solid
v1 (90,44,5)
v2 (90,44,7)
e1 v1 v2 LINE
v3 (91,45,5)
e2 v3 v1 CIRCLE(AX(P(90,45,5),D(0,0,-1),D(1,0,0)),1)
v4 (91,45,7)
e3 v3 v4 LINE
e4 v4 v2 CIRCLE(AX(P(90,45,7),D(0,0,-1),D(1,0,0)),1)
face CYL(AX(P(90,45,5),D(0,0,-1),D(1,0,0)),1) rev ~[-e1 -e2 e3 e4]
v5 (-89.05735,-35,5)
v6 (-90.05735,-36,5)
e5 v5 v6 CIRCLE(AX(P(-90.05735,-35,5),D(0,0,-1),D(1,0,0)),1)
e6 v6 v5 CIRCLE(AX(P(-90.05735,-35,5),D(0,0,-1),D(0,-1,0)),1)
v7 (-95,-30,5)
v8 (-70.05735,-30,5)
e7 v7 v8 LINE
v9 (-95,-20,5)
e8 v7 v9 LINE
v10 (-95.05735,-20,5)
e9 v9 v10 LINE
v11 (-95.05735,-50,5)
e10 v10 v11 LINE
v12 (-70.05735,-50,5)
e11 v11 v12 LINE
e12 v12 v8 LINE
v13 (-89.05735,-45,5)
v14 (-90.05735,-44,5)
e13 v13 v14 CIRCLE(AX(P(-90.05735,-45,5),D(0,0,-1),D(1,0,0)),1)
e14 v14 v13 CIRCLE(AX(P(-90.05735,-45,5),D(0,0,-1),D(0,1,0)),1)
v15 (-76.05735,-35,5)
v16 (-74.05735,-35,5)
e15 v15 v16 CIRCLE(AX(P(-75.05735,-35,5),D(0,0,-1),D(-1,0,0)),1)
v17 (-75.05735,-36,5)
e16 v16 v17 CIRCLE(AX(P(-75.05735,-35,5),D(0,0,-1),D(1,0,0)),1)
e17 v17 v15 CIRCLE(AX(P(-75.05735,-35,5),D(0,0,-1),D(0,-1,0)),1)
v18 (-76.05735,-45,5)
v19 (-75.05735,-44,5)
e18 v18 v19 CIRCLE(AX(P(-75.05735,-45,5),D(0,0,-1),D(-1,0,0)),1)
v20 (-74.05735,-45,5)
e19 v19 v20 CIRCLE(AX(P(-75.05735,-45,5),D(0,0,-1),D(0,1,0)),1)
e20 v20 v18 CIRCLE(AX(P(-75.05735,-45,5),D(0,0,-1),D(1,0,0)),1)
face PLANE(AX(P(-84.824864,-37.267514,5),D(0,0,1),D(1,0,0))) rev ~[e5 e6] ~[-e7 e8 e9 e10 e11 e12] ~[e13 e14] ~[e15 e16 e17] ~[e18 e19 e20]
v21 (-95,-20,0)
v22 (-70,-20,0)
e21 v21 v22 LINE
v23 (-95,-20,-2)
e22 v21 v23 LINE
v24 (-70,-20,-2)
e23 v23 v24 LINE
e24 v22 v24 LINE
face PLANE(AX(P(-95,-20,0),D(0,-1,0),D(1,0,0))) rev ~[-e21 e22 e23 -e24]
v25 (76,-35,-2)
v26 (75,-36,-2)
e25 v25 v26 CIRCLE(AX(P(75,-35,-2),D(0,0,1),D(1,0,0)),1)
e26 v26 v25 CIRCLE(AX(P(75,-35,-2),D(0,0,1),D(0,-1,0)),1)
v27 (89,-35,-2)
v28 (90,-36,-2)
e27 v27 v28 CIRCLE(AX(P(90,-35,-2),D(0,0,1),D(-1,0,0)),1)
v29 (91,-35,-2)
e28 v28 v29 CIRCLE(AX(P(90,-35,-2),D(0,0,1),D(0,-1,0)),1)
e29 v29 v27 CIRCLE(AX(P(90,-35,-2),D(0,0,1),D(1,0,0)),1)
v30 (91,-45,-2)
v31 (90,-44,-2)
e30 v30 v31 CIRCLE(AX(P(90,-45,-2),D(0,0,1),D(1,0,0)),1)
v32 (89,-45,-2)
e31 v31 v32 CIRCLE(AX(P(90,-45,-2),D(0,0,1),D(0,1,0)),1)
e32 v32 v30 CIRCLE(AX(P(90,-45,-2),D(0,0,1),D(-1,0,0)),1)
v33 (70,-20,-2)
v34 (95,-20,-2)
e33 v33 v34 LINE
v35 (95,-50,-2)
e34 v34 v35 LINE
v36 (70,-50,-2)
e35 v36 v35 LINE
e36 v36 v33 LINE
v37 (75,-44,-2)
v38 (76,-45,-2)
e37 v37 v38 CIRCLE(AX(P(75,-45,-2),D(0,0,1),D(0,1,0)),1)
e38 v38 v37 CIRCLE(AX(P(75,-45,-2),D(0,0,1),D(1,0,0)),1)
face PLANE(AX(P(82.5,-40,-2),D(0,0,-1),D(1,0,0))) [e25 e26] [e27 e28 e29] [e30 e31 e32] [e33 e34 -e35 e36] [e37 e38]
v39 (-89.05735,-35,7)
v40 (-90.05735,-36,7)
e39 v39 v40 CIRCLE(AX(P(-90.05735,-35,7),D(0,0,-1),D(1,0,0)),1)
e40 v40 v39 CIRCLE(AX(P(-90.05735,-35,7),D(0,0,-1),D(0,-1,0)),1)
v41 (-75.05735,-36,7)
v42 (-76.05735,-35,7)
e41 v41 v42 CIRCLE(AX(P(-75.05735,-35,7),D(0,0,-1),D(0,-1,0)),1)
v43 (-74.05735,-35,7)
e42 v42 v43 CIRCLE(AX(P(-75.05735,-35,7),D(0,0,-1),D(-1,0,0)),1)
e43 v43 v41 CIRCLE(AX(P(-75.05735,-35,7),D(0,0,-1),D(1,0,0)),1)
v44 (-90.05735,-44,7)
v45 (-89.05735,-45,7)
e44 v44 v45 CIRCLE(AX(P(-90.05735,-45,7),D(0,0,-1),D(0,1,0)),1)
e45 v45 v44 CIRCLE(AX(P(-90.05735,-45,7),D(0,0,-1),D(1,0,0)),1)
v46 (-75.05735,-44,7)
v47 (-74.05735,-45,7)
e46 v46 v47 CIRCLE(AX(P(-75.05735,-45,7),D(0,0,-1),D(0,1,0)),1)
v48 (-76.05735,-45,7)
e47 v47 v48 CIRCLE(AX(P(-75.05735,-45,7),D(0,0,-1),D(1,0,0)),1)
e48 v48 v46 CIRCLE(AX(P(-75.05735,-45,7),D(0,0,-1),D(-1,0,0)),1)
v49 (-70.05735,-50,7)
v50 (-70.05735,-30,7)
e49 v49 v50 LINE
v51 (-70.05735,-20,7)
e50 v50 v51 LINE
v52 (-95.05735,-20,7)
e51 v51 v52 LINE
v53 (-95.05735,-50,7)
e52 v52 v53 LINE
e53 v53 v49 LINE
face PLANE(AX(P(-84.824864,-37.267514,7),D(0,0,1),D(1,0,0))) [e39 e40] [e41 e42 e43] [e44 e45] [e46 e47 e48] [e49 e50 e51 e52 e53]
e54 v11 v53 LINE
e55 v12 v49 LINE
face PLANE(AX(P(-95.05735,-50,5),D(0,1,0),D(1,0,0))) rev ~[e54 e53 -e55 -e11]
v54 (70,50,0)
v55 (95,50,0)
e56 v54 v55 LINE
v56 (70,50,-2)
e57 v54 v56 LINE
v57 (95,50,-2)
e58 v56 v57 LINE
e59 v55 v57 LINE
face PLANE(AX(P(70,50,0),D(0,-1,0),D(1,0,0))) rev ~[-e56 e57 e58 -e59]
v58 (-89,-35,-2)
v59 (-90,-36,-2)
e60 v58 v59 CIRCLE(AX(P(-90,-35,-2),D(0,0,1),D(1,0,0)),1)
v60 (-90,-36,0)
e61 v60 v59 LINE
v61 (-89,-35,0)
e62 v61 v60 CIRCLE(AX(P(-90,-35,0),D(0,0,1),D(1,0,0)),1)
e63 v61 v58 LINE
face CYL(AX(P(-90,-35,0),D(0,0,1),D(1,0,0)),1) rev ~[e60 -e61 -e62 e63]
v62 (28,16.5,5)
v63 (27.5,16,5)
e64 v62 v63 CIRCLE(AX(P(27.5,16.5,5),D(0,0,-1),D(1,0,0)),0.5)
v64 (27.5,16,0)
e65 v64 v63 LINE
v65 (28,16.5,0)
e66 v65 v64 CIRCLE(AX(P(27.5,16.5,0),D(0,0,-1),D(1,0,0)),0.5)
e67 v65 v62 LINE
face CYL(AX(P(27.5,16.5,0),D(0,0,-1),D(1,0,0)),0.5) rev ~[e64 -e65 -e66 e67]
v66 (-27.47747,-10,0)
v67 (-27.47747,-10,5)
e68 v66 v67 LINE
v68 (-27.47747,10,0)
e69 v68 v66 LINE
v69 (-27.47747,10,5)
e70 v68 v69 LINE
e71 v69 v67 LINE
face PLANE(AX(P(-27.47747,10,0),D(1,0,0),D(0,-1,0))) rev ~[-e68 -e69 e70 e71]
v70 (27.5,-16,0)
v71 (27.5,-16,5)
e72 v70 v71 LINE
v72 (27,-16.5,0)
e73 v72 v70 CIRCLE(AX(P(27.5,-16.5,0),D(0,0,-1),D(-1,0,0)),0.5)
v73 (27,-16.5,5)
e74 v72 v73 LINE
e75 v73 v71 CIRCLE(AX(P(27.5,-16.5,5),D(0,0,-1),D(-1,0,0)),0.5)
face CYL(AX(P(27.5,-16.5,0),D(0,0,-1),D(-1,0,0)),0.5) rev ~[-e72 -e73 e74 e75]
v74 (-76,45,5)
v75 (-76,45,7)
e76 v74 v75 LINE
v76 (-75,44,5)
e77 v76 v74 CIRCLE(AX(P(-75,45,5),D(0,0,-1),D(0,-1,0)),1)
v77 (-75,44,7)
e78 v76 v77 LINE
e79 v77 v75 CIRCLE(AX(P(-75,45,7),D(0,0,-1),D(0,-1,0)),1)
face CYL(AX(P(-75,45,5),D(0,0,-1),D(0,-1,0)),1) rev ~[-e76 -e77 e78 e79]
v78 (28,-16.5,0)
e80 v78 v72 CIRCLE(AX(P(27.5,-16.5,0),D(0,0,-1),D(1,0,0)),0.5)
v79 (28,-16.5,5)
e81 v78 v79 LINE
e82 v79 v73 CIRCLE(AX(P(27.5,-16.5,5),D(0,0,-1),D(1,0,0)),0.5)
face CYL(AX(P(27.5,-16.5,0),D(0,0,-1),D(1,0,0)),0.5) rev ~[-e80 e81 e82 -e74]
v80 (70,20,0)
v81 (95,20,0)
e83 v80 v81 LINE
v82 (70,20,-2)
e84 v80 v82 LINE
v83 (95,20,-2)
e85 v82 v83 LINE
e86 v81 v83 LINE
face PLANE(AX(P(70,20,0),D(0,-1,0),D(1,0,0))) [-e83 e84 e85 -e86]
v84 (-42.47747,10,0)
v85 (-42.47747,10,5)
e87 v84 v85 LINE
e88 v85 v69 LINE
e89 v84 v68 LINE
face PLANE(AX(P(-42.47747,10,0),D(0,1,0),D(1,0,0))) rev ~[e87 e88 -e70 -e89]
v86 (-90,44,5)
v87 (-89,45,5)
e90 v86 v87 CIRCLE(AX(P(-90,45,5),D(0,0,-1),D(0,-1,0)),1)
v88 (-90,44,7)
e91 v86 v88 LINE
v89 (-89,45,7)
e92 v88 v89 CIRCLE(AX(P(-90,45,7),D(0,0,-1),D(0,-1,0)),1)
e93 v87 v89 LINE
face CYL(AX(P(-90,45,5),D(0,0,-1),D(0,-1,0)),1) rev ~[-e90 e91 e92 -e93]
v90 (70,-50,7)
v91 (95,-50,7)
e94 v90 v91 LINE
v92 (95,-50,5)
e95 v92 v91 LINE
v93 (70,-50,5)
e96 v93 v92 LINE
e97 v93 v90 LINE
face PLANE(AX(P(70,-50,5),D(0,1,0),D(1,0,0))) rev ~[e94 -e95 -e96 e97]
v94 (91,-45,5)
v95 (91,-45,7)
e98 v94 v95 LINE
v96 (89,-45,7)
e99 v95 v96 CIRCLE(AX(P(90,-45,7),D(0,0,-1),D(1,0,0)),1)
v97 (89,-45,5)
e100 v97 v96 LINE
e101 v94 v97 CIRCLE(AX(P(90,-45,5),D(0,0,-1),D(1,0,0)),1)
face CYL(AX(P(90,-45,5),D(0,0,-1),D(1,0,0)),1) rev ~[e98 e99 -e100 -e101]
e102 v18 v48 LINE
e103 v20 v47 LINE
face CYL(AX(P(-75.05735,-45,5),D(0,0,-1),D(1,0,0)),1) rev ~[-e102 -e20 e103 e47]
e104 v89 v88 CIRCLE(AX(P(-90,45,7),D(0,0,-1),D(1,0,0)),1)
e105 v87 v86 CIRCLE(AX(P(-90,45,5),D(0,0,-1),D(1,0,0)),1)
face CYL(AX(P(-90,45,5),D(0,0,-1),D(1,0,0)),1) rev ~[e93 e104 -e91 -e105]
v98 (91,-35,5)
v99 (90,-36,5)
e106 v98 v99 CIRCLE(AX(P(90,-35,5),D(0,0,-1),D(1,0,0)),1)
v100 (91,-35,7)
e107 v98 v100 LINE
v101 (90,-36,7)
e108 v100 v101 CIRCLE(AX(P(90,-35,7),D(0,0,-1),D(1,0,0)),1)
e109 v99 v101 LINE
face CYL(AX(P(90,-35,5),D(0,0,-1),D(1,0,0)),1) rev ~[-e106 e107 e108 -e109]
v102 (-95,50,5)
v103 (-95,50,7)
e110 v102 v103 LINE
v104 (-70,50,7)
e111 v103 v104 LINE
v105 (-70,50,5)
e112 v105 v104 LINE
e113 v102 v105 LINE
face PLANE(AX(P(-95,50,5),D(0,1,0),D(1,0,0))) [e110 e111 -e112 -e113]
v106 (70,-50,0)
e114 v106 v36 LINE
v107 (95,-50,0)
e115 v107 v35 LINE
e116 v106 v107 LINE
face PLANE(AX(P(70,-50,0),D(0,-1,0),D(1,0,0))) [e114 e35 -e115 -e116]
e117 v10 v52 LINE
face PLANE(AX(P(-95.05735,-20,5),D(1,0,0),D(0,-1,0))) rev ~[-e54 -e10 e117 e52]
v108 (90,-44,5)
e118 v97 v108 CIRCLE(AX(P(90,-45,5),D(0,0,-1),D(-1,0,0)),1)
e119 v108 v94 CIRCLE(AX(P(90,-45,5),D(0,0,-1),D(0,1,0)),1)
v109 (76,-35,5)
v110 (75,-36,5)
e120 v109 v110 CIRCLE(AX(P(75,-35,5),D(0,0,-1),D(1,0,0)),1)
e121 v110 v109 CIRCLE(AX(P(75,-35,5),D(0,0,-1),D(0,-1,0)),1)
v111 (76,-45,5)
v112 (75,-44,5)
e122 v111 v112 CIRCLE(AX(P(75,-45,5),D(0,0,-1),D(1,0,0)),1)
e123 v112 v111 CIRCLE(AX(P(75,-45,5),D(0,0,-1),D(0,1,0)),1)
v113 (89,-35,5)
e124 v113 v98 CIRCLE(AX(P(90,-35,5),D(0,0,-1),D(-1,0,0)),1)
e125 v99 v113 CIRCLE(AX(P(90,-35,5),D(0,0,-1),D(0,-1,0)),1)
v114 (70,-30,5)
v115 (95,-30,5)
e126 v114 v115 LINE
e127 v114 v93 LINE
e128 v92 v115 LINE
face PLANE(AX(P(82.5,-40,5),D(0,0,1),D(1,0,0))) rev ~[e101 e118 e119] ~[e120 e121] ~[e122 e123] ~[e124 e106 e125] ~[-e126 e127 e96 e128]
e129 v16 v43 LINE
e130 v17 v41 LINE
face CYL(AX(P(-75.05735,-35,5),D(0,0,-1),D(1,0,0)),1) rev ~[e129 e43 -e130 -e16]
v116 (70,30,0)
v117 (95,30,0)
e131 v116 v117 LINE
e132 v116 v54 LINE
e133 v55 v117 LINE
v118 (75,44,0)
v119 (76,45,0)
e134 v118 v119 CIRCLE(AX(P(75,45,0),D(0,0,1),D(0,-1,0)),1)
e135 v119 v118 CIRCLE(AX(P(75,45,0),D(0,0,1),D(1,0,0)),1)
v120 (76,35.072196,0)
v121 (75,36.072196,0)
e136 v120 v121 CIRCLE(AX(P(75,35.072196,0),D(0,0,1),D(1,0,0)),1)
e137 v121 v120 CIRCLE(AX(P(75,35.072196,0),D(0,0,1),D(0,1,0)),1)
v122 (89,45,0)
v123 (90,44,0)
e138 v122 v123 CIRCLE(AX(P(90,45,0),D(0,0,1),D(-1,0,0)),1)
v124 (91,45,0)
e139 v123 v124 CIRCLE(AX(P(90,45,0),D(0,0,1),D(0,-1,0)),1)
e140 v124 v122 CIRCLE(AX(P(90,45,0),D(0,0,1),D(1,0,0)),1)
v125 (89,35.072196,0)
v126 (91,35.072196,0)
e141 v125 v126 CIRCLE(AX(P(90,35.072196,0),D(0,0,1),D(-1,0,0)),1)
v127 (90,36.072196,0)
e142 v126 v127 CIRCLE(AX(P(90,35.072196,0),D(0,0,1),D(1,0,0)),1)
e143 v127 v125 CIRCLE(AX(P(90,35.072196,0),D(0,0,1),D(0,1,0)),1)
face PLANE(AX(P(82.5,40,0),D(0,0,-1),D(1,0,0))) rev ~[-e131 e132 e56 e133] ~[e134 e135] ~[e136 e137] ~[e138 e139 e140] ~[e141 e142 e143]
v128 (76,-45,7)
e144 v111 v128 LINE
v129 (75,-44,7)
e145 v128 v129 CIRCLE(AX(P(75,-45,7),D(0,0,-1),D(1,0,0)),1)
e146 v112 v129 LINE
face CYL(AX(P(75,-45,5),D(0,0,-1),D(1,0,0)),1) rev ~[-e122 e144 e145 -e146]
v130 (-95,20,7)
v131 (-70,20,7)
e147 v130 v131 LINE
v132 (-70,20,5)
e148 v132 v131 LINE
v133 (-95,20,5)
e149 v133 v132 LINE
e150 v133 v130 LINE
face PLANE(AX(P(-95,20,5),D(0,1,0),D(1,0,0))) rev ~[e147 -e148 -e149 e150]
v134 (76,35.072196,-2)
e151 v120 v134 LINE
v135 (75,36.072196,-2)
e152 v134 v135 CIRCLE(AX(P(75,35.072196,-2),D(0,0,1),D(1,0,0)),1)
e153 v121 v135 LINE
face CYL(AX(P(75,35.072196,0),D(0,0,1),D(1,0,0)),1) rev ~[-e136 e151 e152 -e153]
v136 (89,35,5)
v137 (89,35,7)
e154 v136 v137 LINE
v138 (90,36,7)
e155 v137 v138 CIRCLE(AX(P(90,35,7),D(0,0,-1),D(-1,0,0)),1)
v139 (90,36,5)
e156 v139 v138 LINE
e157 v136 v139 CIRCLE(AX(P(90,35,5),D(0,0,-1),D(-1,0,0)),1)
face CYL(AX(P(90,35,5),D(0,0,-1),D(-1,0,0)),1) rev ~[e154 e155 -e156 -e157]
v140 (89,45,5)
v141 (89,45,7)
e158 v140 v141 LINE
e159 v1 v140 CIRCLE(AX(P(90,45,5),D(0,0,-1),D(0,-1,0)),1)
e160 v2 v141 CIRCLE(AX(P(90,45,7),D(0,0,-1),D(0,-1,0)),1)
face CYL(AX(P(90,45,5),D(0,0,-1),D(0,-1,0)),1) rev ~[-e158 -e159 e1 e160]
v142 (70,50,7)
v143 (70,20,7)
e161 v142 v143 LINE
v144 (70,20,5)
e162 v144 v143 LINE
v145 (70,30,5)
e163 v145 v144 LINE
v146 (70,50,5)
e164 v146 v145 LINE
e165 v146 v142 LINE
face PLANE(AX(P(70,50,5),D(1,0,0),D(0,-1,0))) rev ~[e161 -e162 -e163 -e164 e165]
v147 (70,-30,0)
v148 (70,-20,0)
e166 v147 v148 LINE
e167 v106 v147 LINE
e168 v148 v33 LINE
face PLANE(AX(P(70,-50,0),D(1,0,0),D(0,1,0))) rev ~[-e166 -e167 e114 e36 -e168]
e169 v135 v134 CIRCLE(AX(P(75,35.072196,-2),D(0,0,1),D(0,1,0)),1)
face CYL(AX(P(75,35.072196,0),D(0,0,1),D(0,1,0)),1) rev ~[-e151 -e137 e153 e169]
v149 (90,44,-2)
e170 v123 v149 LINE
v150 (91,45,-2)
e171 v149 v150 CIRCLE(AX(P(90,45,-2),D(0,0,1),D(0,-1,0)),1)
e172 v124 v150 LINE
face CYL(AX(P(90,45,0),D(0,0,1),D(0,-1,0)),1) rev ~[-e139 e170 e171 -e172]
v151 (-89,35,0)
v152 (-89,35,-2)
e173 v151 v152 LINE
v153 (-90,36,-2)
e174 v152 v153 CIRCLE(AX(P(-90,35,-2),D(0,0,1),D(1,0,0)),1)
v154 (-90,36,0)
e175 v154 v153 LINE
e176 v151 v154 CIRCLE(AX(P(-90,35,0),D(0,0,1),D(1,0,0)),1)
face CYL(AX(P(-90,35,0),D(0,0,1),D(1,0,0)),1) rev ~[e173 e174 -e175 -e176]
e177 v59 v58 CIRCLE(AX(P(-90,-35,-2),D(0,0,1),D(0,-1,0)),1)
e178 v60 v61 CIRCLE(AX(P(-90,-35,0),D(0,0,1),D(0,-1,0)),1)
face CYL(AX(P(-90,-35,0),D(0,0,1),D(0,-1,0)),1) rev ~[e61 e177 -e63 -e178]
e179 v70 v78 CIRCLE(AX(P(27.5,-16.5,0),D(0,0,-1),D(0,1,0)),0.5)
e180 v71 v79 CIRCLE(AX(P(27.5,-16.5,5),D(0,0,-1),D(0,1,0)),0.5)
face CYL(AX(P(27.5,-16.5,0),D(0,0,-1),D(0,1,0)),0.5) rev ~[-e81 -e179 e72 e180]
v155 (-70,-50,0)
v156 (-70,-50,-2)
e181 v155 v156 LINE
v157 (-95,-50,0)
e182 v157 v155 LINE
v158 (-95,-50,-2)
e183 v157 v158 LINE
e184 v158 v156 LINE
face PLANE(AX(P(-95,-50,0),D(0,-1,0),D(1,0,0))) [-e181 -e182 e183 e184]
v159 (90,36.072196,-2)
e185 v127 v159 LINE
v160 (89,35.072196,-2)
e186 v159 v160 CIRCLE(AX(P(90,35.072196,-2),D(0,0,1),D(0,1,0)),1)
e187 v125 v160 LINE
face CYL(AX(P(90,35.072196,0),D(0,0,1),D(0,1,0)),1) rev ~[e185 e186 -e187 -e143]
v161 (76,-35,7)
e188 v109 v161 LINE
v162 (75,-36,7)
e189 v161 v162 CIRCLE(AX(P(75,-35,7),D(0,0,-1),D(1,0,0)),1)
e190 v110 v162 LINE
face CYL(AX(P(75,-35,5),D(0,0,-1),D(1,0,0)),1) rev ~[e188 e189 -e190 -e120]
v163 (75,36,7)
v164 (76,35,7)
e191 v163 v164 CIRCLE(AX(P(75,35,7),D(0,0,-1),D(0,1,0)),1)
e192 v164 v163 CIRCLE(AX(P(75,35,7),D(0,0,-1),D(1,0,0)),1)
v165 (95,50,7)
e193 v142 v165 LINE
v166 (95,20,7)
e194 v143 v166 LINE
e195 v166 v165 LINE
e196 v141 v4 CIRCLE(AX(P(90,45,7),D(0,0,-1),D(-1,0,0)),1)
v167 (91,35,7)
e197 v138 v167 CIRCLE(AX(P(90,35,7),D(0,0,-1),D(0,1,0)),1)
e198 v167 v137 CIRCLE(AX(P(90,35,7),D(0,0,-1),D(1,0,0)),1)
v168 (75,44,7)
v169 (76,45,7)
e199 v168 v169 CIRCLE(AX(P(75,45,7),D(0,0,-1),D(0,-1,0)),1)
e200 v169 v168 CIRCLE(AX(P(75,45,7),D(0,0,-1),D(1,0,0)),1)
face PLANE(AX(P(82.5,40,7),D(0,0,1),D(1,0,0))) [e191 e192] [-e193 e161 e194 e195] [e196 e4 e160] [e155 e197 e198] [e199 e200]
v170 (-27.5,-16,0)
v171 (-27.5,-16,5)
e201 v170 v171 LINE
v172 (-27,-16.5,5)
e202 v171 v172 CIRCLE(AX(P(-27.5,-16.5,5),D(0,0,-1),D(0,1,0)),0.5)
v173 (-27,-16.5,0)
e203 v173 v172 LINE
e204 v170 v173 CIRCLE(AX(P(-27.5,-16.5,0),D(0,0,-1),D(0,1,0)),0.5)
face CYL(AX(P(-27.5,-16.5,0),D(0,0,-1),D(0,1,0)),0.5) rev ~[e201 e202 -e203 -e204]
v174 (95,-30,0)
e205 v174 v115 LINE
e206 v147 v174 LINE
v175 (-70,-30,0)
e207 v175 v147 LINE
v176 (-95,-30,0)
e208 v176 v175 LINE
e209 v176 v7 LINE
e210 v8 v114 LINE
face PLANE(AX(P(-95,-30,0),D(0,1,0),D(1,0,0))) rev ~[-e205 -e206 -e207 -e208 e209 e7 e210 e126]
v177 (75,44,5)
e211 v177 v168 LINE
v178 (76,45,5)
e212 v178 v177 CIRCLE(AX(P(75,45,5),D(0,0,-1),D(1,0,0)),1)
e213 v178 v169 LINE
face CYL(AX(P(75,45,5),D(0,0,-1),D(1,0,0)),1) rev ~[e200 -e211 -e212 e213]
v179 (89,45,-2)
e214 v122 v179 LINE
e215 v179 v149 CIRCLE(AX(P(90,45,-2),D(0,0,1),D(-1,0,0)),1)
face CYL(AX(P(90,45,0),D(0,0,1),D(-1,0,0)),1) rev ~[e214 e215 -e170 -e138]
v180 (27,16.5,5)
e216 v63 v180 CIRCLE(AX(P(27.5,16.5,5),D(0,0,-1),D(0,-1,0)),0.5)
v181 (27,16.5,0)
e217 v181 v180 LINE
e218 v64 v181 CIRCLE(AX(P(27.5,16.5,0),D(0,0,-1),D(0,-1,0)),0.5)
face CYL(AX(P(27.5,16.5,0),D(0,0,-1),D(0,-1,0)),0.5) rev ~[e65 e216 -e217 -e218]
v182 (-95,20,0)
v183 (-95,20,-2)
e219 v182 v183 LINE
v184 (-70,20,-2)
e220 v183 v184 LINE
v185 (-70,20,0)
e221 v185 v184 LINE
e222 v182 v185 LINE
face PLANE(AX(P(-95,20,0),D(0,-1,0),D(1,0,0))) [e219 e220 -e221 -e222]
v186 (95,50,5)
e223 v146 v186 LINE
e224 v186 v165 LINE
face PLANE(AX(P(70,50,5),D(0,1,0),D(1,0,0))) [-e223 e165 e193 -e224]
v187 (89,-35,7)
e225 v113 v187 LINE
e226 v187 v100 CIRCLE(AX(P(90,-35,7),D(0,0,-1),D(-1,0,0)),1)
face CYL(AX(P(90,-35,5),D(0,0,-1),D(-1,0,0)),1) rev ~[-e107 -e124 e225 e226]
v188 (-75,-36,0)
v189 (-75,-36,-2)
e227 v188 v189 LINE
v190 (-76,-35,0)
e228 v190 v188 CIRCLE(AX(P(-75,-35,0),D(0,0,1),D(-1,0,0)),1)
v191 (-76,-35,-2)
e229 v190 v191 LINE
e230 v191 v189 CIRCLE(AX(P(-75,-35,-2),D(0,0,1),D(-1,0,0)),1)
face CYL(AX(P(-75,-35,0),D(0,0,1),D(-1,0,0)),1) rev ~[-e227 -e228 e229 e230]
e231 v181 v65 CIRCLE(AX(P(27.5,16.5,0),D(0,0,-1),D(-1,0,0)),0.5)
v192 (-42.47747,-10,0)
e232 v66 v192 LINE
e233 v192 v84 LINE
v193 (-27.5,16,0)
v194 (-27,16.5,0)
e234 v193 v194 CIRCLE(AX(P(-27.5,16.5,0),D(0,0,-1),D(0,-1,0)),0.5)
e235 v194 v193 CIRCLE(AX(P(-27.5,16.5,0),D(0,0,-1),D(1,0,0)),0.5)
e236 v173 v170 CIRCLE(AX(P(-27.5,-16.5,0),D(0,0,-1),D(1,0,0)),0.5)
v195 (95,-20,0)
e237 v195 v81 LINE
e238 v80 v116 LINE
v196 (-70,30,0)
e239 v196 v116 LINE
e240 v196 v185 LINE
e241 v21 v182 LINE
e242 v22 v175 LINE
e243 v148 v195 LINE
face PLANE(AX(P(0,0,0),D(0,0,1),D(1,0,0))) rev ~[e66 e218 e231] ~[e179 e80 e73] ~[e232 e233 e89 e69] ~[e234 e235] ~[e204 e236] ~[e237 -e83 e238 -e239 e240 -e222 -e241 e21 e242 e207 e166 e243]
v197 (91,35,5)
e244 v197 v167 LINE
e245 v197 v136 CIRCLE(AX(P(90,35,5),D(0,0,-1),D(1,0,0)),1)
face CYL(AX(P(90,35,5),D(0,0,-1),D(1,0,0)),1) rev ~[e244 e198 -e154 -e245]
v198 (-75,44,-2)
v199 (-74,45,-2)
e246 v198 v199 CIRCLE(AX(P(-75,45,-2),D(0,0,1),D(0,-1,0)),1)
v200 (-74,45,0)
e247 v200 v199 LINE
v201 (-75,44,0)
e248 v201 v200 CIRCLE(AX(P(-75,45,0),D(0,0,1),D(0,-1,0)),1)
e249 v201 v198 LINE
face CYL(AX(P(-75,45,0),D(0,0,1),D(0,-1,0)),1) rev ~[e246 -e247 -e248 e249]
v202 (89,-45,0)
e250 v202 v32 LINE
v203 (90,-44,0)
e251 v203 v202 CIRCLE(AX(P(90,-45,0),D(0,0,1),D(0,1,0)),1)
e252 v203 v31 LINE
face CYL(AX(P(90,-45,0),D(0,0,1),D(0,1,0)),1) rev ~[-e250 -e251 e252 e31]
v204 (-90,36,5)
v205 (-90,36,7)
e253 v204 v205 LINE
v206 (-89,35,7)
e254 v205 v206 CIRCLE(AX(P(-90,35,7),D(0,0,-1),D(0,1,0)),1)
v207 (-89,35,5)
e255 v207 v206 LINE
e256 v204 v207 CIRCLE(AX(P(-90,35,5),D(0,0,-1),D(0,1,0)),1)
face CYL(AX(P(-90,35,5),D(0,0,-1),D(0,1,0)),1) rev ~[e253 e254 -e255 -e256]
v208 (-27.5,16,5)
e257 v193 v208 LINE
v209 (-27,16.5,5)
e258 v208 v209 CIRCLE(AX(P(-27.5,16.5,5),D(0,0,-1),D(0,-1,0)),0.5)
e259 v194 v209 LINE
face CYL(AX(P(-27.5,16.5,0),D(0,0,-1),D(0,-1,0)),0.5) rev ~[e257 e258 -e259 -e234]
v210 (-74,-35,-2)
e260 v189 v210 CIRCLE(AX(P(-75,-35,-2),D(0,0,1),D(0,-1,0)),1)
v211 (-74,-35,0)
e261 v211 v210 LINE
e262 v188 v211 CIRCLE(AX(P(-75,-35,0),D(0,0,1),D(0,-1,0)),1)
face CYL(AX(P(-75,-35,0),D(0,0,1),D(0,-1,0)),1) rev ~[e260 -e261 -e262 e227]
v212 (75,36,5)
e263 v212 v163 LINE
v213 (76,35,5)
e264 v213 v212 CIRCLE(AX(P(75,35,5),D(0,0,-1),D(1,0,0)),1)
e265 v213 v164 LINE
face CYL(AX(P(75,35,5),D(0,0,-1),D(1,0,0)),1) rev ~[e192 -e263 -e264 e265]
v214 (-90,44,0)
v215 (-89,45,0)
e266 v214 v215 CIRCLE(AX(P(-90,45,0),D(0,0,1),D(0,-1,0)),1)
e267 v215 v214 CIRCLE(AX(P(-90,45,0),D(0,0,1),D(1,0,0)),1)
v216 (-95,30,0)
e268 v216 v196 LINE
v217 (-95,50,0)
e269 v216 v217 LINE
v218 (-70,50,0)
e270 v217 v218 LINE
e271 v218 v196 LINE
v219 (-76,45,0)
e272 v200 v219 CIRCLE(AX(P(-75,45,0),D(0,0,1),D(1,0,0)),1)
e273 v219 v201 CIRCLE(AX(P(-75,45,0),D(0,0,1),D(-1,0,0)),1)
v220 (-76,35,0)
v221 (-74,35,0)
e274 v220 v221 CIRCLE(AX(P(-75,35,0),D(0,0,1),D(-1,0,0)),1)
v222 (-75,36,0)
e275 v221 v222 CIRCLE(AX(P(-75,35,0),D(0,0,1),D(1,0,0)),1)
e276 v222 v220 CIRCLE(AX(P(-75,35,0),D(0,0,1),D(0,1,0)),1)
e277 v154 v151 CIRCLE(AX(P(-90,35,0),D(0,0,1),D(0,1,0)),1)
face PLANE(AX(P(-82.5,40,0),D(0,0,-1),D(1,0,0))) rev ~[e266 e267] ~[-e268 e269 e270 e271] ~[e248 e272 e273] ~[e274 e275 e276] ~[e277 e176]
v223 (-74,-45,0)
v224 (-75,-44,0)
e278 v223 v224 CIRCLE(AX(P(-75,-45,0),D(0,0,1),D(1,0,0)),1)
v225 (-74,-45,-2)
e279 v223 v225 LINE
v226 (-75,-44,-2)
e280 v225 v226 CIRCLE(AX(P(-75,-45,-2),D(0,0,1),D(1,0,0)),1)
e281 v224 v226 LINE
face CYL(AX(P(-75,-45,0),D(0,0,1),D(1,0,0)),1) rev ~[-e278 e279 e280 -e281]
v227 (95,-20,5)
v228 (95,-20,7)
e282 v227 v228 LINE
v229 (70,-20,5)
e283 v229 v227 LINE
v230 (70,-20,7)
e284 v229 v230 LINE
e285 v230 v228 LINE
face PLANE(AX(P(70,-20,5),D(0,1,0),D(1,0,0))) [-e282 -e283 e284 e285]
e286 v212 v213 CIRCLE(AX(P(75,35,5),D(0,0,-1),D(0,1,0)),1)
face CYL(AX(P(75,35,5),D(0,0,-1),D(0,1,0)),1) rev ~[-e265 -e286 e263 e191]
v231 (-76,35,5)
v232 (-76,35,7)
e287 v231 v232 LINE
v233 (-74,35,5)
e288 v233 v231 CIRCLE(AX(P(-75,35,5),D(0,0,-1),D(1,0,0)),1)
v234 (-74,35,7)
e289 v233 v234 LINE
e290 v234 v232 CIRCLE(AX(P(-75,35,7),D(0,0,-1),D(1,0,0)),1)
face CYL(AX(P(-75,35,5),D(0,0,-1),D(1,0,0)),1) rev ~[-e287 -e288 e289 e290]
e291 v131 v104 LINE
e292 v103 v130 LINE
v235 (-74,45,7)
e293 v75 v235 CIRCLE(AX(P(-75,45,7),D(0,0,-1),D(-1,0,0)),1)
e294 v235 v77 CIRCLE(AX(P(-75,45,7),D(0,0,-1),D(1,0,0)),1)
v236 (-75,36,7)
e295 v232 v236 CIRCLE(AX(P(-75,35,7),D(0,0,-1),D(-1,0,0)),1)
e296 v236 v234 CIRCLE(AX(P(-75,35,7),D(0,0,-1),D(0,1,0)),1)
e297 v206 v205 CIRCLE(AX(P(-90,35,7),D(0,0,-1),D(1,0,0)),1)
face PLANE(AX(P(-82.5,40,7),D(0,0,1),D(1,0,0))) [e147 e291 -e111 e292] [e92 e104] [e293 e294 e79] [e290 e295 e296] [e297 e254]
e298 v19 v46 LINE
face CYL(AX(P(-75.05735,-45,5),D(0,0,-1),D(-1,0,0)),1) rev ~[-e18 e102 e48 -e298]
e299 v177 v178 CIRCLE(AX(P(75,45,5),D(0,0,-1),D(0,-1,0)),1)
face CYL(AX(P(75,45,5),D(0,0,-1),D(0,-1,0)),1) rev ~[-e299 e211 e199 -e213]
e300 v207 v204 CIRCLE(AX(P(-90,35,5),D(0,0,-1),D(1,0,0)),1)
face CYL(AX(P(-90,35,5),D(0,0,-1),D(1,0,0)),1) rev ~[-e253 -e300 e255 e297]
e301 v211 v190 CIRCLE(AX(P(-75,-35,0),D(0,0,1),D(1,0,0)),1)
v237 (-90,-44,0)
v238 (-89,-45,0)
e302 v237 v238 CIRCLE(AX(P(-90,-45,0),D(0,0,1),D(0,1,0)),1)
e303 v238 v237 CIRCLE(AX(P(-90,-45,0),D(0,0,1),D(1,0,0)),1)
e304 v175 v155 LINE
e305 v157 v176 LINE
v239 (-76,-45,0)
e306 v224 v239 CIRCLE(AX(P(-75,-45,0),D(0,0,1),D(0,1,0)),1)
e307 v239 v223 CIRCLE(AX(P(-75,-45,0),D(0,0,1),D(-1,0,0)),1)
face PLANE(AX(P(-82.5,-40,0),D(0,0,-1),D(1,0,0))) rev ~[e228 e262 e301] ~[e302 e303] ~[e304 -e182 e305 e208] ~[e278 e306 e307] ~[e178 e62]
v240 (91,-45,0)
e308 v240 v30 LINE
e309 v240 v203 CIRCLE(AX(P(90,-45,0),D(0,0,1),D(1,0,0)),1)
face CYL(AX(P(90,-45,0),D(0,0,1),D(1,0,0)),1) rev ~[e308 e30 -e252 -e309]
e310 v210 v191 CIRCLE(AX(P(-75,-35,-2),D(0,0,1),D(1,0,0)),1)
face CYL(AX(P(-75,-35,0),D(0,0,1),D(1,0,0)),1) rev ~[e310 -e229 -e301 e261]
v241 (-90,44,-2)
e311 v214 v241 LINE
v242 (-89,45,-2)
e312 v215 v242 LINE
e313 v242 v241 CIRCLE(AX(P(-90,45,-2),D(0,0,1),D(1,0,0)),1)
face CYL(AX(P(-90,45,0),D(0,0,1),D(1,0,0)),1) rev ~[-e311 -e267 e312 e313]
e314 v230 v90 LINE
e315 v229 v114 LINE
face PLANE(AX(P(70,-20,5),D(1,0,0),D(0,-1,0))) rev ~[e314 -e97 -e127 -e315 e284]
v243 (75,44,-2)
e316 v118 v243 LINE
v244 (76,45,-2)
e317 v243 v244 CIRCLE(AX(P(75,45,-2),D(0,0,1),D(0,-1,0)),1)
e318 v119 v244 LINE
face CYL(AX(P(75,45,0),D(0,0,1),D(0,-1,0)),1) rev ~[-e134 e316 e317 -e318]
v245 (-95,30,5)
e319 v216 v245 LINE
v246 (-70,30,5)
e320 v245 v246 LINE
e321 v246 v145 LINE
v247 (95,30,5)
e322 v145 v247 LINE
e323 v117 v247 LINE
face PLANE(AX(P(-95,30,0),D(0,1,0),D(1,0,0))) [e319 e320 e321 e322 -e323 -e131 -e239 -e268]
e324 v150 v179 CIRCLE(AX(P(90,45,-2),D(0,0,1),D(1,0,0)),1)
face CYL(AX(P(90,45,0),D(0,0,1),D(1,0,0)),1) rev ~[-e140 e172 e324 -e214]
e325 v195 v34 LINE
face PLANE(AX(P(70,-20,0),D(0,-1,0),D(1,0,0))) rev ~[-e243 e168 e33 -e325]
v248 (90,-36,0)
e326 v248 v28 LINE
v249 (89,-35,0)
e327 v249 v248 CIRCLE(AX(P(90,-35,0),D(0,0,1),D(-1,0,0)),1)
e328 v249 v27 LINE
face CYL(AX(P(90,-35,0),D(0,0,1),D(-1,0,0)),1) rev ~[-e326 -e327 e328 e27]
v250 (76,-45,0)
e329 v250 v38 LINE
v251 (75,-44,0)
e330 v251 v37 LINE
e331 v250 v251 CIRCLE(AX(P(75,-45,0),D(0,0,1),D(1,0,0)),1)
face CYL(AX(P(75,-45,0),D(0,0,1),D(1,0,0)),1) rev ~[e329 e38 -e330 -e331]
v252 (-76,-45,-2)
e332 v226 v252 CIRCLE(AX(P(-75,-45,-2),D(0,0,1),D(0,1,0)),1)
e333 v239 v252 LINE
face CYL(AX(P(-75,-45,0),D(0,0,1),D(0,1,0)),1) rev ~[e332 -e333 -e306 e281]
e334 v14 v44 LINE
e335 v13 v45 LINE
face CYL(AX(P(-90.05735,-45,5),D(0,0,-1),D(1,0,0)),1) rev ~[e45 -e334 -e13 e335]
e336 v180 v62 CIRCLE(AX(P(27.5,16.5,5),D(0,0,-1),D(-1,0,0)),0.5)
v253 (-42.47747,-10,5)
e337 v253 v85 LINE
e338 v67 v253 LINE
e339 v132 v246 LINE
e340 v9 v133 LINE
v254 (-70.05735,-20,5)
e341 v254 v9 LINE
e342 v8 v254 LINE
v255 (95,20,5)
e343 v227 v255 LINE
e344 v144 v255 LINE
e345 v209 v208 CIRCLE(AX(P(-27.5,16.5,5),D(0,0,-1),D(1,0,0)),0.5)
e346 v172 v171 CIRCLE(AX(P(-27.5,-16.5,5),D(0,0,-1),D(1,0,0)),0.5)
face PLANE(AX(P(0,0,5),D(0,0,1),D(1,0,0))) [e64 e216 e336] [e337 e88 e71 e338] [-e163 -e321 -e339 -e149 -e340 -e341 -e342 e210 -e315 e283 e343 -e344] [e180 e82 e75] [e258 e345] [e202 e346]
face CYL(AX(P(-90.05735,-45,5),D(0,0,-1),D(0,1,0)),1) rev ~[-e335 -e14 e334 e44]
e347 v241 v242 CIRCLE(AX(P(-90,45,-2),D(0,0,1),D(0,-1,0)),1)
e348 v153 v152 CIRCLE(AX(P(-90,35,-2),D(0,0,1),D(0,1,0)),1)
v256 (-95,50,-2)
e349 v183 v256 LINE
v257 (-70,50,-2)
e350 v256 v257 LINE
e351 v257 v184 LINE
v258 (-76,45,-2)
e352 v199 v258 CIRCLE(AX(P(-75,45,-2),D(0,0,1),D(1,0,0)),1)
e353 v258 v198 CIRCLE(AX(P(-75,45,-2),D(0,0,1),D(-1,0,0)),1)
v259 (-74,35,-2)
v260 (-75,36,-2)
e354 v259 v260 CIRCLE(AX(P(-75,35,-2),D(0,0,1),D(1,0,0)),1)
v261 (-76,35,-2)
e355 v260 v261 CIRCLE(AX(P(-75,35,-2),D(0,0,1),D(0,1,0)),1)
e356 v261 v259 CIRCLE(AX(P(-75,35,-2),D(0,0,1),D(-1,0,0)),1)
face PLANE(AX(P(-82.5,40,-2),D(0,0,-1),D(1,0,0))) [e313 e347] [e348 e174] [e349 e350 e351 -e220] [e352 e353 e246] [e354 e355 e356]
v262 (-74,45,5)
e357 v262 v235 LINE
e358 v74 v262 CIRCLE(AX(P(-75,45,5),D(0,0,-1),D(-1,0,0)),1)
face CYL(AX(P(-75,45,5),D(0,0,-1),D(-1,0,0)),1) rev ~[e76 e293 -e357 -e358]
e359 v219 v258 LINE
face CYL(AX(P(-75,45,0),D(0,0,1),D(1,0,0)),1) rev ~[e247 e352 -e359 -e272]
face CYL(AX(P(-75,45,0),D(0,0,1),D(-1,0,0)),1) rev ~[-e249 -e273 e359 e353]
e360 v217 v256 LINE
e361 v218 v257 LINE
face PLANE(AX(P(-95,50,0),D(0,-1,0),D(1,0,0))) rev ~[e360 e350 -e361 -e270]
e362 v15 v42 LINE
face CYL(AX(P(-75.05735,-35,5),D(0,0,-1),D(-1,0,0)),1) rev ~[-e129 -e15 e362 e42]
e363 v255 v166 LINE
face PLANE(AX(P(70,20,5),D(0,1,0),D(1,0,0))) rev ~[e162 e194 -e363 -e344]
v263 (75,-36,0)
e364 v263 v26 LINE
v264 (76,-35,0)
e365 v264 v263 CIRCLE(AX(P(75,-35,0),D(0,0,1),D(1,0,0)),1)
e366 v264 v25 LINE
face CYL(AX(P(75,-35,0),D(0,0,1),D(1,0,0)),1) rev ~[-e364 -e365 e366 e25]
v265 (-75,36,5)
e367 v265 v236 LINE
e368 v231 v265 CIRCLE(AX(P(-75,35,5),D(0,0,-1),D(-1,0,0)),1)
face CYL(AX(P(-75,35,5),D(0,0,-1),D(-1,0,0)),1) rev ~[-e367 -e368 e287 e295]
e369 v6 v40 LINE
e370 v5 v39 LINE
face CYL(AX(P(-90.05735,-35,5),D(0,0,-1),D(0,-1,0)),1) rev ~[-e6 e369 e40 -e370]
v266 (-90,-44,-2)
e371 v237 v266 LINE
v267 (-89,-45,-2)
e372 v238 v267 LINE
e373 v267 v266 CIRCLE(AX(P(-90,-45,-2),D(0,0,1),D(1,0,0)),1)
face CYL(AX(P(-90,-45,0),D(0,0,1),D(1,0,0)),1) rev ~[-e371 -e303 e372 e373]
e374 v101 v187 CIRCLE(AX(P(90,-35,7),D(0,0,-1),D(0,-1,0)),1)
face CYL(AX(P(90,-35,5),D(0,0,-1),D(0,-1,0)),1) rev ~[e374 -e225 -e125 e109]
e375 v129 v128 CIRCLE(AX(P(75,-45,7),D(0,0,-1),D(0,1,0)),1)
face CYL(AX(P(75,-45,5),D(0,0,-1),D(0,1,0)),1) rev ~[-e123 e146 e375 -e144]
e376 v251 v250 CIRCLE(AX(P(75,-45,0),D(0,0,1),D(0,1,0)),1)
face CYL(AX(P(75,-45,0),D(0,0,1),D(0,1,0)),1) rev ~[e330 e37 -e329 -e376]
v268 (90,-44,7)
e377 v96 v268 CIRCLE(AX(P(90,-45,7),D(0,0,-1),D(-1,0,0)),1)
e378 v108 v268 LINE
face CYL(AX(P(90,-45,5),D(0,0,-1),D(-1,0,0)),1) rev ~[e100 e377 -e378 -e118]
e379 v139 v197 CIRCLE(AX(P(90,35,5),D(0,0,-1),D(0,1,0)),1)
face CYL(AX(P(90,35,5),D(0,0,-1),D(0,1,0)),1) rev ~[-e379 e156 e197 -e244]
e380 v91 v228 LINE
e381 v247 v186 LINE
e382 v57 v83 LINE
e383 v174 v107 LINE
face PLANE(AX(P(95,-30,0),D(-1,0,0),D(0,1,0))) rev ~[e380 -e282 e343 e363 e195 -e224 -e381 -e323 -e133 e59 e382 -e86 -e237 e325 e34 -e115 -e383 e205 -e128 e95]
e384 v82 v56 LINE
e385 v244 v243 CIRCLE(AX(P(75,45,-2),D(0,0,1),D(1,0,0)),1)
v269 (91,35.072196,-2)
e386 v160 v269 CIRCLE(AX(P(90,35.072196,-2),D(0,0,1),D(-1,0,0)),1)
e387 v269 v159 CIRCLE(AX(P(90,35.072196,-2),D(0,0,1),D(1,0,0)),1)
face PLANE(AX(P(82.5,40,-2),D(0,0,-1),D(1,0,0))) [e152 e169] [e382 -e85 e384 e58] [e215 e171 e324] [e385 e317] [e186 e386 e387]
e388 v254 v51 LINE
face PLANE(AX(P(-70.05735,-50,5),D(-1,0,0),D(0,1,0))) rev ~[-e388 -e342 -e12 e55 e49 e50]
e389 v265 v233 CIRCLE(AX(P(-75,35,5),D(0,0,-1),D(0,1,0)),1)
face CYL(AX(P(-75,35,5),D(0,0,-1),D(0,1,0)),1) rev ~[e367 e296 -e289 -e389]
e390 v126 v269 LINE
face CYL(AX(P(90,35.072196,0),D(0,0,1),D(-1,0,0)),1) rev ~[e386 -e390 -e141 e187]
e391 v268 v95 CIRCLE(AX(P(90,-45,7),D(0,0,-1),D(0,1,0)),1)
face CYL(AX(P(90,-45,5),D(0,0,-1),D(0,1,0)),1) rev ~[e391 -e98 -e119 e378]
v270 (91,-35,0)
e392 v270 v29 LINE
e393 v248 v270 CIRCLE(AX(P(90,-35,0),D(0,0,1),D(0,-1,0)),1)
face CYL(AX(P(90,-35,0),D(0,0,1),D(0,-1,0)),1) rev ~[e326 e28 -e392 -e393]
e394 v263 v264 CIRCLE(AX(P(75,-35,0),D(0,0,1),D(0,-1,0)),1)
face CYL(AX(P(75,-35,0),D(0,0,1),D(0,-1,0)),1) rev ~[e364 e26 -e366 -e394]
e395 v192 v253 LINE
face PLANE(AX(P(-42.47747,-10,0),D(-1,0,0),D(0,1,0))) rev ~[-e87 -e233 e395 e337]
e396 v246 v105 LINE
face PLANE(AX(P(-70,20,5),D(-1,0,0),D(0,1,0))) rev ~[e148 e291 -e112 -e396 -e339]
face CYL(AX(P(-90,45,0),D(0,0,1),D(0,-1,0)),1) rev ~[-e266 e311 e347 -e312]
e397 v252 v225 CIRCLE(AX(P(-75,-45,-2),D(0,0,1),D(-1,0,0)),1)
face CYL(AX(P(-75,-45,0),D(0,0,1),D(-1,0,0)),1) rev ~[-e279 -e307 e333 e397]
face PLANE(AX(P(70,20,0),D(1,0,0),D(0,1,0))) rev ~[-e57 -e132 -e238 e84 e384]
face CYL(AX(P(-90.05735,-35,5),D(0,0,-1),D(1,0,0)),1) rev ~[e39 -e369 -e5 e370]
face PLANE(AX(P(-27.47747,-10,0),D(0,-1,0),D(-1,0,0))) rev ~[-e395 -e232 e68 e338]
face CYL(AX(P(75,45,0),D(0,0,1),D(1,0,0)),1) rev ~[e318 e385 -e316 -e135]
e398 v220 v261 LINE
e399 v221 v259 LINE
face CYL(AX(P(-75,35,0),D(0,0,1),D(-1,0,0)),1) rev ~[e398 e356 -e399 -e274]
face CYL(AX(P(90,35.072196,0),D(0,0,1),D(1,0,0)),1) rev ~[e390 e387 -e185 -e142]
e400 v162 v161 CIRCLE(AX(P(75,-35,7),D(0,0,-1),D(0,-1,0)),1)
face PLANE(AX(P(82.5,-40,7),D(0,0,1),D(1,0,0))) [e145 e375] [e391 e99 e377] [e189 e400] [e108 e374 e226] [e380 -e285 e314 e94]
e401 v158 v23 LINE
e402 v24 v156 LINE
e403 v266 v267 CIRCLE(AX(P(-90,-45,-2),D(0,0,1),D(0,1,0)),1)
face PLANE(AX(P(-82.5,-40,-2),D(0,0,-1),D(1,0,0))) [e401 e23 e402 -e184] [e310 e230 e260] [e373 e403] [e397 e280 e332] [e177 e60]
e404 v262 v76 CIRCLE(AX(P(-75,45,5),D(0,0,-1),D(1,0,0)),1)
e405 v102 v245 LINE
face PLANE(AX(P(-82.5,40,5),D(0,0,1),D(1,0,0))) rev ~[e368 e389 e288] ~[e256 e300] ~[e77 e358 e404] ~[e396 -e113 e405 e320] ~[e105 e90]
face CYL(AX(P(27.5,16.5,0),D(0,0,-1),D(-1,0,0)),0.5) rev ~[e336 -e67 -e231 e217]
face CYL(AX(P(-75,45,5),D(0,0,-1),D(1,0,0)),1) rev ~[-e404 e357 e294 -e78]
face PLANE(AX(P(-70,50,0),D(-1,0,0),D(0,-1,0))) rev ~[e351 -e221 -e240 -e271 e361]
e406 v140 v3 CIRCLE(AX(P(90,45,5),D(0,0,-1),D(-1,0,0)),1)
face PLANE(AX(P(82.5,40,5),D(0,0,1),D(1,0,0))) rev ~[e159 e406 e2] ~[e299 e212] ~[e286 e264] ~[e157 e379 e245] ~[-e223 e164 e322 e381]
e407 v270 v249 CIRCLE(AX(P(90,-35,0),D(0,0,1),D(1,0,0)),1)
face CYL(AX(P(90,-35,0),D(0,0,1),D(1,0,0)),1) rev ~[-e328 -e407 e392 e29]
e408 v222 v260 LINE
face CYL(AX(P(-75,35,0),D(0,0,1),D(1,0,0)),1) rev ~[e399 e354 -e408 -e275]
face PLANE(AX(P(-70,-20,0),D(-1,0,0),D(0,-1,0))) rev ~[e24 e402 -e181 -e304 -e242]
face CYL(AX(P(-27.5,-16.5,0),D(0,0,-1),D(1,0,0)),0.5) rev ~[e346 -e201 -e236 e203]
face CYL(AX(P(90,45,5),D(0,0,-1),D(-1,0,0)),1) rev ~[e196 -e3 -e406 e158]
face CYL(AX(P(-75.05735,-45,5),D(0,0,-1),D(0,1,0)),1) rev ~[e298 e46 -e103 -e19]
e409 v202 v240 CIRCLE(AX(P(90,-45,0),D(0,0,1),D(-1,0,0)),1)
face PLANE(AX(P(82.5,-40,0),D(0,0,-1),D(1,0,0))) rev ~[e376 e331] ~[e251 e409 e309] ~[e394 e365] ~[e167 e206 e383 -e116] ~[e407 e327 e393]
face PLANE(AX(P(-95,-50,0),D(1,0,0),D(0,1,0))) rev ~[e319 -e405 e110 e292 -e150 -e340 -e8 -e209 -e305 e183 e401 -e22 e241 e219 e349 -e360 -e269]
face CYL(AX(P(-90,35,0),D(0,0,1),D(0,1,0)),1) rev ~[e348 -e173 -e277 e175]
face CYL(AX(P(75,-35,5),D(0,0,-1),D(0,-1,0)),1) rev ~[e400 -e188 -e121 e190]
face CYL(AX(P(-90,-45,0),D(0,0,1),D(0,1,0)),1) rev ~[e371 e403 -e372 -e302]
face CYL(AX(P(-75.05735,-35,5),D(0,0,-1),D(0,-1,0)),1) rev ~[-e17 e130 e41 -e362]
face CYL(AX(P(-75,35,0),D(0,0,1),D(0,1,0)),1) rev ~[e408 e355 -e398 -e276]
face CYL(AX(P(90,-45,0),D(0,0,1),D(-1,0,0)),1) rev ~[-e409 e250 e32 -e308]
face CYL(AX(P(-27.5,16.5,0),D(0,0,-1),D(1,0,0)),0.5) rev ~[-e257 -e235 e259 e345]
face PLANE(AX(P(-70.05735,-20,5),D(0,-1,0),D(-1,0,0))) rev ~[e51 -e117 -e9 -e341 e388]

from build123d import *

# Parameters (mm, degrees)
F0_W     = 190
F0_H     = 60
F1_DEPTH = 5
F2_W     = 25
F2_H     = 20
F2_H_2   = 10
F2_W_2   = 24.9426496029
F3_DEPTH = 2
F4_W     = 25
F4_H     = 20
F4_H_2   = 10
F5_DEPTH = 2


with BuildPart() as f1:
    # F0 (on Top) → F1 (new body)
    with BuildSketch(Plane.XY):
        Rectangle(F0_W, F0_H)
        with BuildLine():
            Line((27, -16.5), (-27, -16.5))
            ThreePointArc((-27, -16.5), (-27.8535533906, -16.8535533906), (-27.5, -16))
            Line((-27.5, -16), (-27.5, -10))
            Line((-27.5, -10), (-42.4774698913, -10))
            Line((-42.4774698913, -10), (-42.4774698913, 10))
            Line((-42.4774698913, 10), (-27.5, 10))
            Line((-27.5, 10), (-27.5, 16))
            ThreePointArc((-27.5, 16), (-27.8535533906, 16.8535533906), (-27, 16.5))
            Line((-27, 16.5), (27, 16.5))
            ThreePointArc((27, 16.5), (27.5, 17), (28, 16.5))
            ThreePointArc((28, 16.5), (27.8535533906, 16.1464466094), (27.5, 16))
            Line((27.5, 16), (27.5, -16))
            ThreePointArc((27.5, -16), (27.8535533906, -16.1464466094), (28, -16.5))
            ThreePointArc((28, -16.5), (27.5, -17), (27, -16.5))
        make_face(mode=Mode.SUBTRACT)
        with BuildLine():
            ThreePointArc((-27.5, -16), (-27.1464466094, -16.1464466094), (-27, -16.5))
            Line((-27, -16.5), (27, -16.5))
            ThreePointArc((27, -16.5), (27.1464466094, -16.1464466094), (27.5, -16))
            Line((27.5, -16), (27.5, 16))
            ThreePointArc((27.5, 16), (27.1464466094, 16.1464466094), (27, 16.5))
            Line((27, 16.5), (-27, 16.5))
            ThreePointArc((-27, 16.5), (-27.1464466094, 16.1464466094), (-27.5, 16))
            Line((-27.5, 16), (-27.5, 10))
            Line((-27.5, 10), (-27.4774698913, 10))
            Line((-27.4774698913, 10), (-27.4774698913, -10))
            Line((-27.4774698913, -10), (-27.5, -10))
            Line((-27.5, -10), (-27.5, -16))
        make_face()
    extrude(amount=F1_DEPTH)

    # F2 (on face) → F3 (join)
    with BuildSketch(Plane.XY.offset(5)):
        Polygon((-95, -30), (-95, -20), (-95.0573503971, -20), (-95.0573503971, -50), (-70.0573503971, -50), (-70.0573503971, -30), align=None)
        with BuildLine():
            Line((-76.0573503971, -45), (-89.0573503971, -45))
            ThreePointArc((-89.0573503971, -45), (-90.7644571783, -45.7071067812), (-90.0573503971, -44))
            Line((-90.0573503971, -44), (-90.0573503971, -36))
            ThreePointArc((-90.0573503971, -36), (-90.7644571783, -34.2928932188), (-89.0573503971, -35))
            Line((-89.0573503971, -35), (-76.0573503971, -35))
            ThreePointArc((-76.0573503971, -35), (-75.0573503971, -34), (-74.0573503971, -35))
            ThreePointArc((-74.0573503971, -35), (-74.3502436159, -35.7071067812), (-75.0573503971, -36))
            Line((-75.0573503971, -36), (-75.0573503971, -44))
            ThreePointArc((-75.0573503971, -44), (-74.3502436159, -44.2928932188), (-74.0573503971, -45))
            ThreePointArc((-74.0573503971, -45), (-75.0573503971, -46), (-76.0573503971, -45))
        make_face(mode=Mode.SUBTRACT)
        with Locations((-82.5, 40)):
            Rectangle(F2_W, F2_H)
        with BuildLine():
            ThreePointArc((-90, 44), (-90.7071067812, 45.7071067812), (-89, 45))
            Line((-89, 45), (-76, 45))
            ThreePointArc((-76, 45), (-75, 46), (-74, 45))
            ThreePointArc((-74, 45), (-74.2928932188, 44.2928932188), (-75, 44))
            Line((-75, 44), (-75, 36))
            ThreePointArc((-75, 36), (-74.2928932188, 35.7071067812), (-74, 35))
            ThreePointArc((-74, 35), (-75, 34), (-76, 35))
            Line((-76, 35), (-89, 35))
            ThreePointArc((-89, 35), (-90.7071067812, 34.2928932188), (-90, 36))
            Line((-90, 36), (-90, 44))
        make_face(mode=Mode.SUBTRACT)
        with Locations((82.5, 40)):
            Rectangle(F2_W, F2_H)
        with BuildLine():
            ThreePointArc((75, 44), (74.2928932188, 45.7071067812), (76, 45))
            Line((76, 45), (89, 45))
            ThreePointArc((89, 45), (90, 46), (91, 45))
            ThreePointArc((91, 45), (90.7071067812, 44.2928932188), (90, 44))
            Line((90, 44), (90, 36))
            ThreePointArc((90, 36), (90.7071067812, 35.7071067812), (91, 35))
            ThreePointArc((91, 35), (90, 34), (89, 35))
            Line((89, 35), (76, 35))
            ThreePointArc((76, 35), (74.2928932188, 34.2928932188), (75, 36))
            Line((75, 36), (75, 44))
        make_face(mode=Mode.SUBTRACT)
        with Locations((82.5, -40)):
            Rectangle(F2_W, F2_H)
        with BuildLine():
            Line((89, -45), (76, -45))
            ThreePointArc((76, -45), (74.2928932188, -45.7071067812), (75, -44))
            Line((75, -44), (75, -36))
            ThreePointArc((75, -36), (74.2928932188, -34.2928932188), (76, -35))
            Line((76, -35), (89, -35))
            ThreePointArc((89, -35), (90, -34), (91, -35))
            ThreePointArc((91, -35), (90.7071067812, -35.7071067812), (90, -36))
            Line((90, -36), (90, -44))
            ThreePointArc((90, -44), (90.7071067812, -44.2928932188), (91, -45))
            ThreePointArc((91, -45), (90, -46), (89, -45))
        make_face(mode=Mode.SUBTRACT)
        with Locations((-82.5, 25)):
            Rectangle(F2_W, F2_H_2)
        with Locations((82.5, 25)):
            Rectangle(F2_W, F2_H_2)
        with Locations((82.5, -25)):
            Rectangle(F2_W, F2_H_2)
        with Locations((-82.5286751986, -25)):
            Rectangle(F2_W_2, F2_H_2)
        with BuildLine():
            Line((-76, 45), (-89, 45))
            ThreePointArc((-89, 45), (-89.2928932188, 44.2928932188), (-90, 44))
            Line((-90, 44), (-90, 36))
            ThreePointArc((-90, 36), (-89.2928932188, 35.7071067812), (-89, 35))
            Line((-89, 35), (-76, 35))
            ThreePointArc((-76, 35), (-75.7071067812, 35.7071067812), (-75, 36))
            Line((-75, 36), (-75, 44))
            ThreePointArc((-75, 44), (-75.7071067812, 44.2928932188), (-76, 45))
        make_face()
        with BuildLine():
            Line((89, 45), (76, 45))
            ThreePointArc((76, 45), (75.7071067812, 44.2928932188), (75, 44))
            Line((75, 44), (75, 36))
            ThreePointArc((75, 36), (75.7071067812, 35.7071067812), (76, 35))
            Line((76, 35), (89, 35))
            ThreePointArc((89, 35), (89.2928932188, 35.7071067812), (90, 36))
            Line((90, 36), (90, 44))
            ThreePointArc((90, 44), (89.2928932188, 44.2928932188), (89, 45))
        make_face()
        with BuildLine():
            ThreePointArc((75, -44), (75.7071067812, -44.2928932188), (76, -45))
            Line((76, -45), (89, -45))
            ThreePointArc((89, -45), (89.2928932188, -44.2928932188), (90, -44))
            Line((90, -44), (90, -36))
            ThreePointArc((90, -36), (89.2928932188, -35.7071067812), (89, -35))
            Line((89, -35), (76, -35))
            ThreePointArc((76, -35), (75.7071067812, -35.7071067812), (75, -36))
            Line((75, -36), (75, -44))
        make_face()
        with BuildLine():
            ThreePointArc((-90.0573503971, -44), (-89.3502436159, -44.2928932188), (-89.0573503971, -45))
            Line((-89.0573503971, -45), (-76.0573503971, -45))
            ThreePointArc((-76.0573503971, -45), (-75.7644571783, -44.2928932188), (-75.0573503971, -44))
            Line((-75.0573503971, -44), (-75.0573503971, -36))
            ThreePointArc((-75.0573503971, -36), (-75.7644571783, -35.7071067812), (-76.0573503971, -35))
            Line((-76.0573503971, -35), (-89.0573503971, -35))
            ThreePointArc((-89.0573503971, -35), (-89.3502436159, -35.7071067812), (-90.0573503971, -36))
            Line((-90.0573503971, -36), (-90.0573503971, -44))
        make_face()
    extrude(amount=F3_DEPTH)

    # F4 (on face) → F5 (join)
    with BuildSketch(Plane(origin=(0, 0, 0), x_dir=(1, 0, 0), z_dir=(0, 0, -1))):
        with Locations((-82.5, 40)):
            Rectangle(F4_W, F4_H)
        with BuildLine():
            ThreePointArc((-90, 44), (-90.7071067812, 45.7071067812), (-89, 45))
            Line((-89, 45), (-76, 45))
            ThreePointArc((-76, 45), (-75, 46), (-74, 45))
            ThreePointArc((-74, 45), (-74.2928932188, 44.2928932188), (-75, 44))
            Line((-75, 44), (-75, 36))
            ThreePointArc((-75, 36), (-74.2928932188, 35.7071067812), (-74, 35))
            ThreePointArc((-74, 35), (-75, 34), (-76, 35))
            Line((-76, 35), (-89, 35))
            ThreePointArc((-89, 35), (-90.7071067812, 34.2928932188), (-90, 36))
            Line((-90, 36), (-90, 44))
        make_face(mode=Mode.SUBTRACT)
        with Locations((82.5, 40)):
            Rectangle(F4_W, F4_H)
        with BuildLine():
            ThreePointArc((75, 44), (74.2928932188, 45.7071067812), (76, 45))
            Line((76, 45), (89, 45))
            ThreePointArc((89, 45), (90, 46), (91, 45))
            ThreePointArc((91, 45), (90.7071067812, 44.2928932188), (90, 44))
            Line((90, 44), (90, 36))
            ThreePointArc((90, 36), (90.7071067812, 35.7071067812), (91, 35))
            ThreePointArc((91, 35), (90, 34), (89, 35))
            Line((89, 35), (76, 35))
            ThreePointArc((76, 35), (74.2928932188, 34.2928932188), (75, 36))
            Line((75, 36), (75, 44))
        make_face(mode=Mode.SUBTRACT)
        with Locations((82.5, -40)):
            Rectangle(F4_W, F4_H)
        with BuildLine():
            Line((89, -45), (76, -45))
            ThreePointArc((76, -45), (74.2928932188, -45.7071067812), (75, -44))
            Line((75, -44), (75, -36.0721963992))
            ThreePointArc((75, -36.0721963992), (74.2928932188, -34.365089618), (76, -35.0721963992))
            Line((76, -35.0721963992), (89, -35.0721963992))
            ThreePointArc((89, -35.0721963992), (90, -34.0721963992), (91, -35.0721963992))
            ThreePointArc((91, -35.0721963992), (90.7071067812, -35.7793031804), (90, -36.0721963992))
            Line((90, -36.0721963992), (90, -44))
            ThreePointArc((90, -44), (90.7071067812, -44.2928932188), (91, -45))
            ThreePointArc((91, -45), (90, -46), (89, -45))
        make_face(mode=Mode.SUBTRACT)
        with Locations((-82.5, -40)):
            Rectangle(F4_W, F4_H)
        with BuildLine():
            Line((-76, -45), (-89, -45))
            ThreePointArc((-89, -45), (-90.7071067812, -45.7071067812), (-90, -44))
            Line((-90, -44), (-90, -36))
            ThreePointArc((-90, -36), (-90.7071067812, -34.2928932188), (-89, -35))
            Line((-89, -35), (-76, -35))
            ThreePointArc((-76, -35), (-75, -34), (-74, -35))
            ThreePointArc((-74, -35), (-74.2928932188, -35.7071067812), (-75, -36))
            Line((-75, -36), (-75, -44))
            ThreePointArc((-75, -44), (-74.2928932188, -44.2928932188), (-74, -45))
            ThreePointArc((-74, -45), (-75, -46), (-76, -45))
        make_face(mode=Mode.SUBTRACT)
        with Locations((-82.5, 25)):
            Rectangle(F4_W, F4_H_2)
        with Locations((82.5, 25)):
            Rectangle(F4_W, F4_H_2)
        with Locations((82.5, -25)):
            Rectangle(F4_W, F4_H_2)
        with Locations((-82.5, -25)):
            Rectangle(F4_W, F4_H_2)
        with BuildLine():
            Line((-76, 45), (-89, 45))
            ThreePointArc((-89, 45), (-89.2928932188, 44.2928932188), (-90, 44))
            Line((-90, 44), (-90, 36))
            ThreePointArc((-90, 36), (-89.2928932188, 35.7071067812), (-89, 35))
            Line((-89, 35), (-76, 35))
            ThreePointArc((-76, 35), (-75.7071067812, 35.7071067812), (-75, 36))
            Line((-75, 36), (-75, 44))
            ThreePointArc((-75, 44), (-75.7071067812, 44.2928932188), (-76, 45))
        make_face()
        with BuildLine():
            Line((89, 45), (76, 45))
            ThreePointArc((76, 45), (75.7071067812, 44.2928932188), (75, 44))
            Line((75, 44), (75, 36))
            ThreePointArc((75, 36), (75.7071067812, 35.7071067812), (76, 35))
            Line((76, 35), (89, 35))
            ThreePointArc((89, 35), (89.2928932188, 35.7071067812), (90, 36))
            Line((90, 36), (90, 44))
            ThreePointArc((90, 44), (89.2928932188, 44.2928932188), (89, 45))
        make_face()
        with BuildLine():
            ThreePointArc((-90, -44), (-89.2928932188, -44.2928932188), (-89, -45))
            Line((-89, -45), (-76, -45))
            ThreePointArc((-76, -45), (-75.7071067812, -44.2928932188), (-75, -44))
            Line((-75, -44), (-75, -36))
            ThreePointArc((-75, -36), (-75.7071067812, -35.7071067812), (-76, -35))
            Line((-76, -35), (-89, -35))
            ThreePointArc((-89, -35), (-89.2928932188, -35.7071067812), (-90, -36))
            Line((-90, -36), (-90, -44))
        make_face()
        with BuildLine():
            ThreePointArc((75, -44), (75.7071067812, -44.2928932188), (76, -45))
            Line((76, -45), (89, -45))
            ThreePointArc((89, -45), (89.2928932188, -44.2928932188), (90, -44))
            Line((90, -44), (90, -36.0721963992))
            ThreePointArc((90, -36.0721963992), (89.2928932188, -35.7793031804), (89, -35.0721963992))
            Line((89, -35.0721963992), (76, -35.0721963992))
            ThreePointArc((76, -35.0721963992), (75.7071067812, -35.7793031804), (75, -36.0721963992))
            Line((75, -36.0721963992), (75, -44))
        make_face()
    extrude(amount=F5_DEPTH)


solid = f1.part
